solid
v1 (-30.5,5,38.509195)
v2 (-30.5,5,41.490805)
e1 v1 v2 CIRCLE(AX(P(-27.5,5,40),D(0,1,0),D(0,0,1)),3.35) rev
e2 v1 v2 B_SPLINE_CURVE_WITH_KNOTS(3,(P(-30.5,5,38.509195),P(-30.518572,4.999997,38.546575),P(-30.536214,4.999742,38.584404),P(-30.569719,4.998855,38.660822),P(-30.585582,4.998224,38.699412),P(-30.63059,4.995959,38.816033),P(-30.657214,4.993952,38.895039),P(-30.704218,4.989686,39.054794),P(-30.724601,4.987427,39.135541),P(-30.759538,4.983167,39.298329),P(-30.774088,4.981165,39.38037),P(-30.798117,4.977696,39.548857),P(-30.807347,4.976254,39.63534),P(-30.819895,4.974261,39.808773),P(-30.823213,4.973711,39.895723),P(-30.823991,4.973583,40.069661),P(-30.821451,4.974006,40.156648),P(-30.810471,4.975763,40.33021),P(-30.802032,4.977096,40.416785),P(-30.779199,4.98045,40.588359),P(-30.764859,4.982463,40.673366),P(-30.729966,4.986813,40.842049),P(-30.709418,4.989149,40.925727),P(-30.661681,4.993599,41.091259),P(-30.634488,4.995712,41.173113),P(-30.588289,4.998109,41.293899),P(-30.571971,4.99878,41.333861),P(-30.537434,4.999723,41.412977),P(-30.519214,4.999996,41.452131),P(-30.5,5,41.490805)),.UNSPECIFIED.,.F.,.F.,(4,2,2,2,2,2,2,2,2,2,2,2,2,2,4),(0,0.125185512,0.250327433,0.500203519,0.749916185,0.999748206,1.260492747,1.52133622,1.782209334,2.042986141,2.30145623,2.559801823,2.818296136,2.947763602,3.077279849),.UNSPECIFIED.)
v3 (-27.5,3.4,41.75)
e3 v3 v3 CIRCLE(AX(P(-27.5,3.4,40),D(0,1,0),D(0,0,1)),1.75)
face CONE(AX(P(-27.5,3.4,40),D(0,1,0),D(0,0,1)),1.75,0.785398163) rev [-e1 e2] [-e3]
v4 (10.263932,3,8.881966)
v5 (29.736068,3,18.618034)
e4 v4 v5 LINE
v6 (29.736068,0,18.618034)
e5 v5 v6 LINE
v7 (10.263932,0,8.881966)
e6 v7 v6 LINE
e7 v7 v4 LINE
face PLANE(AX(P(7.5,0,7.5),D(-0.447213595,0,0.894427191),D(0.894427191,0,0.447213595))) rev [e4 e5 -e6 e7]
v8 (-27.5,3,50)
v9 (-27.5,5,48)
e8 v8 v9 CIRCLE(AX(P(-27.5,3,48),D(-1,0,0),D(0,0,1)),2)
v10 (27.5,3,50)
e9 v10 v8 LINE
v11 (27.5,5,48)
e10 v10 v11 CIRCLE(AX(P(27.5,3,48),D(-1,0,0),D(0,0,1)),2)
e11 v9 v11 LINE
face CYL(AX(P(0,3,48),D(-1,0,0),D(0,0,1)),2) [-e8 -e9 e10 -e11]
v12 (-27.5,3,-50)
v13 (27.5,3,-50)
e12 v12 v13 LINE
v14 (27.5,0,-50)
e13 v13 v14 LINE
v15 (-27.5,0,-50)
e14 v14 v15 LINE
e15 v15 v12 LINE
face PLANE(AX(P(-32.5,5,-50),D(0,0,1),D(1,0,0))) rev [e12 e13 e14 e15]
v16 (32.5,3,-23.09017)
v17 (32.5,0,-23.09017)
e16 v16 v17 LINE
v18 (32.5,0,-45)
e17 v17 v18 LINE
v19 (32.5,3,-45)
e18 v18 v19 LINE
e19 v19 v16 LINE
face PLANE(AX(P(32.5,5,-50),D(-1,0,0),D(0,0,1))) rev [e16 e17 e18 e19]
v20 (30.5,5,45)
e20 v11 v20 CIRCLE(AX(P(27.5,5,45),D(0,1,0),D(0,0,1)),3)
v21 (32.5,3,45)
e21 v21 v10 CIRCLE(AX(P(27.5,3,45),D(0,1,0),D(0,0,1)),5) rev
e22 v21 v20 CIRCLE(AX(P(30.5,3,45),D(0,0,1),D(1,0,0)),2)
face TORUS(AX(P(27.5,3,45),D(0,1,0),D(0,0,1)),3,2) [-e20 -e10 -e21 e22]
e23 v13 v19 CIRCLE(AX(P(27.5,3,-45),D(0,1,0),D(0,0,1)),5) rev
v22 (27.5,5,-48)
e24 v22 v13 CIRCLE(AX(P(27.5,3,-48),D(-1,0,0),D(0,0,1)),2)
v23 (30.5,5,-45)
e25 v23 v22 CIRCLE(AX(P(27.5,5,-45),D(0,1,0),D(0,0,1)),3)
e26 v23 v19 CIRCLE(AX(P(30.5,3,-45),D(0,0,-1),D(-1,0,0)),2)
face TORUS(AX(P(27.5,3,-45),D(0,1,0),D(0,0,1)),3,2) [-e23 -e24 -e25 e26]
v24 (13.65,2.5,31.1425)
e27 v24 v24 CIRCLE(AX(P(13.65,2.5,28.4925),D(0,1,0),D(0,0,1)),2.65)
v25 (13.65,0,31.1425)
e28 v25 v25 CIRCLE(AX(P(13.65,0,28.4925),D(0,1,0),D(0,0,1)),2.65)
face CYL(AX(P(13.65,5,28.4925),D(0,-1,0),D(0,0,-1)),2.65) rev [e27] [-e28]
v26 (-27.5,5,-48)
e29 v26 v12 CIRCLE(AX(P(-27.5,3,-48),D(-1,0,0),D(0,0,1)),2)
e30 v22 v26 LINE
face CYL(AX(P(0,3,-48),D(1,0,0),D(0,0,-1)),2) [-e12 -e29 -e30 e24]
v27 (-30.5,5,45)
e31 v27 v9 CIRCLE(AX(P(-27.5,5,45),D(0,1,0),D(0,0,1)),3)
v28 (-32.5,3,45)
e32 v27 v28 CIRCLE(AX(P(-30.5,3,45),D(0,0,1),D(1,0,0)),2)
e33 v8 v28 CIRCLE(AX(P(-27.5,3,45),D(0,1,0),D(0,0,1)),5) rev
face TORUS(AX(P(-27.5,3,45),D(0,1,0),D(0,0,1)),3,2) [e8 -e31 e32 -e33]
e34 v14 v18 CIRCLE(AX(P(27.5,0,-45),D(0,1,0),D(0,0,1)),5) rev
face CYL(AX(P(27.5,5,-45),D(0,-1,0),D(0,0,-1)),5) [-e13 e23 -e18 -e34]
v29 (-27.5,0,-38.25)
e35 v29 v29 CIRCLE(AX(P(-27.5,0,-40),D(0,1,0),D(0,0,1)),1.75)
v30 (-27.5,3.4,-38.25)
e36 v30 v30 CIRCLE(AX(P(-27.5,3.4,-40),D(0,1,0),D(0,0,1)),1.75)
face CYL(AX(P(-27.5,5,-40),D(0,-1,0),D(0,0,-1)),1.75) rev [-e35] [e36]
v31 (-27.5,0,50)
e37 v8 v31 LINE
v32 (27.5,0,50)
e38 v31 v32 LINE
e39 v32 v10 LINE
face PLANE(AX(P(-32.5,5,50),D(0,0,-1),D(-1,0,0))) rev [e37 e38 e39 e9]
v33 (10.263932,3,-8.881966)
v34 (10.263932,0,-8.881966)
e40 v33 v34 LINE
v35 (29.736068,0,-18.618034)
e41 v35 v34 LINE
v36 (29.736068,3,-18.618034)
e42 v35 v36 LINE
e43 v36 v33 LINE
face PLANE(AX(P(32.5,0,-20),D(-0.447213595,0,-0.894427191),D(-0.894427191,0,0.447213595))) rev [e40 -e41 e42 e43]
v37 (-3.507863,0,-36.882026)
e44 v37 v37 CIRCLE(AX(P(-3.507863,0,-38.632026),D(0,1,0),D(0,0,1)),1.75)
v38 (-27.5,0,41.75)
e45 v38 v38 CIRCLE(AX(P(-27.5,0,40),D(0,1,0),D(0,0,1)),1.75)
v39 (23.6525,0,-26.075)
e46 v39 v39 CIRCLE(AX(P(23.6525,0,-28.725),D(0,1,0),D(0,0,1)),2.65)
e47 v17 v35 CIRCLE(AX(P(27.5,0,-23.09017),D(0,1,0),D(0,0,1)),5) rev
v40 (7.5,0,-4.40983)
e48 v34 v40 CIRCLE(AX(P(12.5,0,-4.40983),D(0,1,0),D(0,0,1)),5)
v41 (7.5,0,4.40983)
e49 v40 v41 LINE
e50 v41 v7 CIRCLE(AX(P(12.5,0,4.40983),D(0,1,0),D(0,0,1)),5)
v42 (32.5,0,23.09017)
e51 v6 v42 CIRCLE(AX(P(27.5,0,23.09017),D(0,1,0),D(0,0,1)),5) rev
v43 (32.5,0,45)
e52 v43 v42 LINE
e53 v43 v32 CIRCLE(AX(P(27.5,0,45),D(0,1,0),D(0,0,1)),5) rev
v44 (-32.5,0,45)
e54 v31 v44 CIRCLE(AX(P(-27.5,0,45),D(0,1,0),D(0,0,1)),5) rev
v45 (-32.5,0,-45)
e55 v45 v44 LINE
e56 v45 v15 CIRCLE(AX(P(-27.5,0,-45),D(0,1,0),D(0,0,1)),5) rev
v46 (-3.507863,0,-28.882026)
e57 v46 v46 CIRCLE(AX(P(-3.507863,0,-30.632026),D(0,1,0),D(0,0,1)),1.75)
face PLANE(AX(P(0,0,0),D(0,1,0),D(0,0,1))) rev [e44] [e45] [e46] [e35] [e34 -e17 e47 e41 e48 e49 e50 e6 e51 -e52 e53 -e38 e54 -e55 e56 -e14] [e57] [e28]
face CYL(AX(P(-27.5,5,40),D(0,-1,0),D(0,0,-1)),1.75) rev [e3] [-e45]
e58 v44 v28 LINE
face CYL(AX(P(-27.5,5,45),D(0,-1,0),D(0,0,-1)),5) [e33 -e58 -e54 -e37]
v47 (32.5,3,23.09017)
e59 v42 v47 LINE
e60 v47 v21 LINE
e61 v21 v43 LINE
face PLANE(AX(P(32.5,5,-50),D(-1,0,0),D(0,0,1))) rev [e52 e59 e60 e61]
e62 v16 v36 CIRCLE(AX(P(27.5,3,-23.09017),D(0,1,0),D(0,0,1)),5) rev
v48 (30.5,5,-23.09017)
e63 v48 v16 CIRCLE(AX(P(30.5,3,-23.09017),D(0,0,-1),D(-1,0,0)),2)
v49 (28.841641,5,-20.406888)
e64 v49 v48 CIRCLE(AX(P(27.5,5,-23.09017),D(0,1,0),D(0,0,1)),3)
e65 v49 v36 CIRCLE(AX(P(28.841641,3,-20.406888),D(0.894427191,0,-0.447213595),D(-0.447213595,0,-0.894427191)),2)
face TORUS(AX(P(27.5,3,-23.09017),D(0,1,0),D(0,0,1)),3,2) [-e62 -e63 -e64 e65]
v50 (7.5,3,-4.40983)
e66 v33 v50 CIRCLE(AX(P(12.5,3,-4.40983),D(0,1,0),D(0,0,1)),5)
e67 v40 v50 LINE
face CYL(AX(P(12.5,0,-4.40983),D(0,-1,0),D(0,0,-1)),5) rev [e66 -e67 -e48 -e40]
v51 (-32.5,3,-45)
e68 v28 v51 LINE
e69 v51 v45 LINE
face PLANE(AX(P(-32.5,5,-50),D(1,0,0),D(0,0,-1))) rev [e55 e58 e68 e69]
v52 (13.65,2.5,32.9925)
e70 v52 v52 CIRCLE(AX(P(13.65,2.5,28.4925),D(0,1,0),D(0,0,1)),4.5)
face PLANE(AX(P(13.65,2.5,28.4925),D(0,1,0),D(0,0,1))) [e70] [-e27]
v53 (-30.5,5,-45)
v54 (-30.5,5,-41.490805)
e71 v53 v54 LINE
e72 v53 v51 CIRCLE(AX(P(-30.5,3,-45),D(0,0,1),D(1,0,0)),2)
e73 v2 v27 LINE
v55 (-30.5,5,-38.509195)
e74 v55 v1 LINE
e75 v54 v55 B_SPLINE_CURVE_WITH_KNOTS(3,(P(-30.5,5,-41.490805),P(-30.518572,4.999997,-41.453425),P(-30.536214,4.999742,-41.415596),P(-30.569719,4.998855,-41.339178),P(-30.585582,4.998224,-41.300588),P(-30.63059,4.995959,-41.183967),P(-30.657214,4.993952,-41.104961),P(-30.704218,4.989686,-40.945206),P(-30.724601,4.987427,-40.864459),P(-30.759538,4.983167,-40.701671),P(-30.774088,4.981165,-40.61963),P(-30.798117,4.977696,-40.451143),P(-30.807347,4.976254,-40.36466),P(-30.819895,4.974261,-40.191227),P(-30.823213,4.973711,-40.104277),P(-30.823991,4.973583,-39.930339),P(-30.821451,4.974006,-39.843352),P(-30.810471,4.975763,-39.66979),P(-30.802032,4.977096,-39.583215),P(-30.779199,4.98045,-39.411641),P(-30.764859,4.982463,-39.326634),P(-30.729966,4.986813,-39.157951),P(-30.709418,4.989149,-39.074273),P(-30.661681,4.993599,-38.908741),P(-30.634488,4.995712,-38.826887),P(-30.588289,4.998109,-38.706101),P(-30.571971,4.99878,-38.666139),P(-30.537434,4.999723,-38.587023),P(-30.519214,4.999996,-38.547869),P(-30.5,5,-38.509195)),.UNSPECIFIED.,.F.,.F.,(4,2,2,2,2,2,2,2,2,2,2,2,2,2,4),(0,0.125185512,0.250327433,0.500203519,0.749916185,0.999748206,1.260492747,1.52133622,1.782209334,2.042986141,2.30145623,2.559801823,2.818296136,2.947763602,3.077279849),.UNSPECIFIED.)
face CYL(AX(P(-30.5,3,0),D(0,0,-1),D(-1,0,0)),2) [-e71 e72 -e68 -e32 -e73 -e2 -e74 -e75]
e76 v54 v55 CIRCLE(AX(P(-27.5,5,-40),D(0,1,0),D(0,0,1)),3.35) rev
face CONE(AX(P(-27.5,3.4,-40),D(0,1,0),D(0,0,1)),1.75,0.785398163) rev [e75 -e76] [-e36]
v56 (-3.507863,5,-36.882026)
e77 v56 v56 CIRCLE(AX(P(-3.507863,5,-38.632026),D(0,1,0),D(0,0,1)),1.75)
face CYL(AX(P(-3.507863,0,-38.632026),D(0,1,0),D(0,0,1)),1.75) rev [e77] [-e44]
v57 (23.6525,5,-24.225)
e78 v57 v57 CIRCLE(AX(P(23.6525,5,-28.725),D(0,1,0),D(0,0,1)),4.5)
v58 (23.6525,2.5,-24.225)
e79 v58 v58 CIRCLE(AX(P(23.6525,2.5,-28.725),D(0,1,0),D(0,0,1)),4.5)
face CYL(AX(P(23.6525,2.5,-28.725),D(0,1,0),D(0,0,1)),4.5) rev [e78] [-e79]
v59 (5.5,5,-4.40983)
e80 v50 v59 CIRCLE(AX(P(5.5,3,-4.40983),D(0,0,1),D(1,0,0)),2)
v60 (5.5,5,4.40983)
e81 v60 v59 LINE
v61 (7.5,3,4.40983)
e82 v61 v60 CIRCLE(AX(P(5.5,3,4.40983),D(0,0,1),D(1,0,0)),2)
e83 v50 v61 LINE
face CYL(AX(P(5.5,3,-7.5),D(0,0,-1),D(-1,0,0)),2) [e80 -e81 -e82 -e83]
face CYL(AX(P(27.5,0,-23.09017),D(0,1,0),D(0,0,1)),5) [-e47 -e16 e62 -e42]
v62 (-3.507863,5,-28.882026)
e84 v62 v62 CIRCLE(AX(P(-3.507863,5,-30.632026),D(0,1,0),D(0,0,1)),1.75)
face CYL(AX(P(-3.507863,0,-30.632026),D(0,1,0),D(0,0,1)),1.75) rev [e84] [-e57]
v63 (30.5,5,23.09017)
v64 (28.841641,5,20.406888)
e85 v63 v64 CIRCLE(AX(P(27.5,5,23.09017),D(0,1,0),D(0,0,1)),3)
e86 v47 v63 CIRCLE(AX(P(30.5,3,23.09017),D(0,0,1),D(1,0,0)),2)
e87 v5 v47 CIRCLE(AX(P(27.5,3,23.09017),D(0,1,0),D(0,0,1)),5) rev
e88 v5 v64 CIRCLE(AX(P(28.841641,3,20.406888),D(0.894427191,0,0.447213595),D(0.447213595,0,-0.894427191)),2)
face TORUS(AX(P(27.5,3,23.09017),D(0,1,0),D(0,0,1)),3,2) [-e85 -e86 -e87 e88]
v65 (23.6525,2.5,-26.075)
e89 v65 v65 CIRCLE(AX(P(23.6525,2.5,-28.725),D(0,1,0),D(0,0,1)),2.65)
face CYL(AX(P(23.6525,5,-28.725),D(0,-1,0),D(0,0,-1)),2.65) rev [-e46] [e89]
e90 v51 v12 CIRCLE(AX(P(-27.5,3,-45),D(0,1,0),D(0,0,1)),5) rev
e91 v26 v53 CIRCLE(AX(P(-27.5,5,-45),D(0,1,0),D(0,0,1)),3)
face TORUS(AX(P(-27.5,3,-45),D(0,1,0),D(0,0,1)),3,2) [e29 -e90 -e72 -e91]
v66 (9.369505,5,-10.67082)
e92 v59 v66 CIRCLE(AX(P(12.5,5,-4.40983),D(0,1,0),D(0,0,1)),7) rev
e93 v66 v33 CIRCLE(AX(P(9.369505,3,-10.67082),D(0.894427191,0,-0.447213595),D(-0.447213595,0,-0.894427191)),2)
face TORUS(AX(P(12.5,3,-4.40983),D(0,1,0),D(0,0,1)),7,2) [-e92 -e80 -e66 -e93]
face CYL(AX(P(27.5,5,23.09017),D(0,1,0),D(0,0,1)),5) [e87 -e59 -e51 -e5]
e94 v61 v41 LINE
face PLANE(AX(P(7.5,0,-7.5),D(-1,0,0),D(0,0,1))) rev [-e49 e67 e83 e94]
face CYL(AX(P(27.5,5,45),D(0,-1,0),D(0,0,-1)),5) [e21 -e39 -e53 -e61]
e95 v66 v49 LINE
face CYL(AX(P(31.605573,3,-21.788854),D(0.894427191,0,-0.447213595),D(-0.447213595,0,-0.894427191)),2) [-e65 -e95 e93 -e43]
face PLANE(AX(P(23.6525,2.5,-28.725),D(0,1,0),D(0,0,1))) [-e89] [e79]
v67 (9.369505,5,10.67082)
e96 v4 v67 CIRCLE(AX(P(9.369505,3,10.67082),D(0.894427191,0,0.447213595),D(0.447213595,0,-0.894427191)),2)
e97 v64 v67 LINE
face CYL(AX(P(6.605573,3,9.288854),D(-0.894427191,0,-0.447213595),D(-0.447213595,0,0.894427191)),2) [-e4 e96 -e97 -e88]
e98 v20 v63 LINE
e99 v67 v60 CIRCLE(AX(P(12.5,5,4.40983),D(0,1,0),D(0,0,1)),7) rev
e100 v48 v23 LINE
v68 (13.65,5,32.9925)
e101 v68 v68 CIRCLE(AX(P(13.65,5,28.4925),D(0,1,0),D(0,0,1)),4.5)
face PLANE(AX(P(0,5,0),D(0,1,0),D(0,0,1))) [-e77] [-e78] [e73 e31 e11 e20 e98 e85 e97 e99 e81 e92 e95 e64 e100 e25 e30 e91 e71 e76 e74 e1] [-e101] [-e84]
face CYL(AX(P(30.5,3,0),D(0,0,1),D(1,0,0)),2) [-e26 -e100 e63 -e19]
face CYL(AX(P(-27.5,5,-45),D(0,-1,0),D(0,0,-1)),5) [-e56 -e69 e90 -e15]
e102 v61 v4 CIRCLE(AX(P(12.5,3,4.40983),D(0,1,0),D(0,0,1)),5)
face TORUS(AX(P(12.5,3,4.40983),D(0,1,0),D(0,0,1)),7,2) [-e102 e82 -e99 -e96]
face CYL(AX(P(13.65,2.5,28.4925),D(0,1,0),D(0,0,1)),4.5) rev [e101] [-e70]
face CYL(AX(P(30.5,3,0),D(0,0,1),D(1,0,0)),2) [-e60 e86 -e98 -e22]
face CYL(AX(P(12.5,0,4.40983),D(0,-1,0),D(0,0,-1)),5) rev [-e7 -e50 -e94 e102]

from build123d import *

# Parameters (mm, degrees)
SKETCH2_W           = 65
SKETCH2_H           = 100
SKETCH2_R           = 1.75
SKETCH2_R_2         = 2.65
BOSS_EXTRUDE1_DEPTH = 5
SKETCH3_R           = 4.5
CUT_EXTRUDE1_DEPTH  = 2.5
CUT_EXTRUDE2_DEPTH  = 60.843546018
FILLET1_R           = 5
CHAMFER1_SIZE       = 1.6
FILLET3_R           = 5
FILLET2_R           = 2
SKETCH5_R           = 1.75
CUT_EXTRUDE3_DEPTH  = 60.843546072


with BuildPart() as part:
    # Sketch2 → Boss-Extrude1 (new body)
    with BuildSketch(Plane(origin=(0, 0, 0), x_dir=(1, 0, 0), z_dir=(0, 1, 0))):
        Rectangle(SKETCH2_W, SKETCH2_H)
        with Locations(Location((-27.5, 40, 0), (0, 0, 270))):
            Circle(SKETCH2_R, mode=Mode.SUBTRACT)
        with Locations(Location((-27.5, -40, 0), (0, 0, 270))):
            Circle(SKETCH2_R, mode=Mode.SUBTRACT)
        with Locations(Location((23.6525, 28.725, 0), (0, 0, 270))):
            Circle(SKETCH2_R_2, mode=Mode.SUBTRACT)
        with Locations(Location((13.65, -28.4925, 0), (0, 0, 270))):
            Circle(SKETCH2_R_2, mode=Mode.SUBTRACT)
    extrude(amount=BOSS_EXTRUDE1_DEPTH)

    # Sketch3 → Cut-Extrude1 (cut)
    with BuildSketch(Plane(origin=(0, 5, 0), x_dir=(1, 0, 0), z_dir=(0, 1, 0))):
        with Locations(Location((23.6525, 28.725, 0), (0, 0, 270))):
            Circle(SKETCH3_R)
        with Locations(Location((13.65, -28.4925, 0), (0, 0, 270))):
            Circle(SKETCH3_R)
    extrude(amount=-CUT_EXTRUDE1_DEPTH, mode=Mode.SUBTRACT)

    # Sketch4 → Cut-Extrude2 (cut, through all)
    with BuildSketch(Plane(origin=(0, 5, 0), x_dir=(1, 0, 0), z_dir=(0, 1, 0))):
        Polygon((7.5, 7.5), (7.5, -7.5), (32.5, -20), (32.5, 20), align=None)
    extrude(amount=-CUT_EXTRUDE2_DEPTH, mode=Mode.SUBTRACT)

    # Fillet1
    fillet1_edges = [part.edges().sort_by_distance(p)[0] for p in [
        (32.5, 2.5, 50),
        (-32.5, 2.5, 50),
        (-32.5, 2.5, -50),
        (32.5, 2.5, -50),
    ]]
    fillet(fillet1_edges, radius=FILLET1_R)

    # Chamfer1
    chamfer1_edges = [part.edges().sort_by_distance(p)[0] for p in [
        (-27.5, 5, -41.75),
        (-27.5, 5, 38.25),
    ]]
    chamfer(chamfer1_edges, length=CHAMFER1_SIZE)

    # Fillet3
    fillet3_edges = [part.edges().sort_by_distance(p)[0] for p in [
        (7.5, 2.5, -7.5),
        (32.5, 2.5, -20),
        (32.5, 2.5, 20),
        (7.5, 2.5, 7.5),
    ]]
    fillet(fillet3_edges, radius=FILLET3_R)

    # Fillet2
    # the kernel refuses this fillet: 2 mm, written as the material it takes off along each edge
    with BuildSketch(Plane(origin=(12.5, 5, 4.409830056), x_dir=(-0.447213595499958, 0, 0.894427190999916), z_dir=(0.894427190999916, 0, 0.447213595499958))) as fillet2_piece_1:
        with BuildLine():
            CenterArc((5 + FILLET2_R, FILLET2_R), FILLET2_R, 180, 90)
            Line((5, FILLET2_R), (5, 0))
            Line((5, 0), (5 + FILLET2_R, 0))
        make_face()
    revolve(axis=Axis((12.5, 5, 4.409830056), (0, -1, 0)), revolution_arc=63.434948823, mode=Mode.SUBTRACT)
    with BuildSketch(Plane(origin=(12.5, 5, -4.409830056), x_dir=(-0.447213595499958, 0, -0.894427190999916), z_dir=(0.894427190999916, 0, -0.447213595499958))) as fillet2_piece_2:
        with BuildLine():
            CenterArc((5 + FILLET2_R, -FILLET2_R), FILLET2_R, 90, 90)
            Line((5, -FILLET2_R), (5, 0))
            Line((5, 0), (5 + FILLET2_R, 0))
        make_face()
    revolve(axis=Axis((12.5, 5, -4.409830056), (0, 1, 0)), revolution_arc=63.434948823, mode=Mode.SUBTRACT)
    with BuildSketch(Plane(origin=(32.5, 5, 23.090169944), x_dir=(-1, 0, 0), z_dir=(0, 0, 1)), Plane(origin=(32.5, 5, -45), x_dir=(-1, 0, 0), z_dir=(0, 0, 1))) as fillet2_piece_3:
        with BuildLine():
            CenterArc((FILLET2_R, FILLET2_R), FILLET2_R, 180, 90)
            Line((0, FILLET2_R), (0, 0))
            Line((0, 0), (FILLET2_R, 0))
        make_face()
    extrude(amount=21.909830056, mode=Mode.SUBTRACT)
    with BuildSketch(Plane(origin=(27.5, 5, 50), x_dir=(0, 0, -1), z_dir=(-1, 0, 0)), Plane(origin=(-27.5, 5, -50), x_dir=(0, 0, 1), z_dir=(1, 0, 0))) as fillet2_piece_4:
        with BuildLine():
            CenterArc((FILLET2_R, FILLET2_R), FILLET2_R, 180, 90)
            Line((0, FILLET2_R), (0, 0))
            Line((0, 0), (FILLET2_R, 0))
        make_face()
    extrude(amount=55, mode=Mode.SUBTRACT)
    with BuildSketch(Plane(origin=(-32.5, 5, 45), x_dir=(1, 0, 0), z_dir=(0, 0, -1))) as fillet2_piece_5:
        with BuildLine():
            CenterArc((FILLET2_R, FILLET2_R), FILLET2_R, 180, 90)
            Line((0, FILLET2_R), (0, 0))
            Line((0, 0), (FILLET2_R, 0))
        make_face()
    extrude(amount=90, mode=Mode.SUBTRACT)
    with BuildSketch(Plane(origin=(-27.5, 5, 45), x_dir=(-1, 0, 0), z_dir=(0, 0, -1))) as fillet2_piece_6:
        with BuildLine():
            CenterArc((5 - FILLET2_R, -FILLET2_R), FILLET2_R, 0, 90)
            Line((5, -FILLET2_R), (5, 0))
            Line((5, 0), (5 - FILLET2_R, 0))
        make_face()
    revolve(axis=Axis((-27.5, 5, 45), (0, 1, 0)), revolution_arc=90, mode=Mode.SUBTRACT)
    with BuildSketch(Plane(origin=(27.5, 5, -45), x_dir=(0, 0, -1), z_dir=(-1, 0, 0))) as fillet2_piece_7:
        with BuildLine():
            CenterArc((5 - FILLET2_R, FILLET2_R), FILLET2_R, 270, 90)
            Line((5, FILLET2_R), (5, 0))
            Line((5, 0), (5 - FILLET2_R, 0))
        make_face()
    revolve(axis=Axis((27.5, 5, -45), (0, -1, 0)), revolution_arc=90, mode=Mode.SUBTRACT)
    with BuildSketch(Plane(origin=(-27.5, 5, -45), x_dir=(0, 0, -1), z_dir=(1, 0, 0))) as fillet2_piece_8:
        with BuildLine():
            CenterArc((5 - FILLET2_R, -FILLET2_R), FILLET2_R, 0, 90)
            Line((5, -FILLET2_R), (5, 0))
            Line((5, 0), (5 - FILLET2_R, 0))
        make_face()
    revolve(axis=Axis((-27.5, 5, -45), (0, 1, 0)), revolution_arc=90, mode=Mode.SUBTRACT)
    with BuildSketch(Plane(origin=(27.5, 5, 45), x_dir=(0, 0, 1), z_dir=(-1, 0, 0))) as fillet2_piece_9:
        with BuildLine():
            CenterArc((5 - FILLET2_R, -FILLET2_R), FILLET2_R, 0, 90)
            Line((5, -FILLET2_R), (5, 0))
            Line((5, 0), (5 - FILLET2_R, 0))
        make_face()
    revolve(axis=Axis((27.5, 5, 45), (0, 1, 0)), revolution_arc=90, mode=Mode.SUBTRACT)
    with BuildSketch(Plane(origin=(29.736067977, 5, -18.618033989), x_dir=(-0.4472135954999579, 0, -0.8944271909999159), z_dir=(-0.894427190999916, 0, 0.4472135954999579)), Plane(origin=(10.263932023, 5, 8.881966011), x_dir=(-0.4472135954999579, 0, 0.894427190999916), z_dir=(0.894427190999916, 0, 0.4472135954999579))) as fillet2_piece_10:
        with BuildLine():
            CenterArc((FILLET2_R, FILLET2_R), FILLET2_R, 180, 90)
            Line((0, FILLET2_R), (0, 0))
            Line((0, 0), (FILLET2_R, 0))
        make_face()
    extrude(amount=21.770509831, mode=Mode.SUBTRACT)
    with BuildSketch(Plane(origin=(7.5, 5, -4.409830056), x_dir=(-1, 0, 0), z_dir=(0, 0, 1))) as fillet2_piece_11:
        with BuildLine():
            CenterArc((FILLET2_R, FILLET2_R), FILLET2_R, 180, 90)
            Line((0, FILLET2_R), (0, 0))
            Line((0, 0), (FILLET2_R, 0))
        make_face()
    extrude(amount=8.819660113, mode=Mode.SUBTRACT)
    with BuildSketch(Plane(origin=(27.5, 5, 23.090169944), x_dir=(1, 0, 0), z_dir=(0, 0, 1))) as fillet2_piece_12:
        with BuildLine():
            CenterArc((5 - FILLET2_R, -FILLET2_R), FILLET2_R, 0, 90)
            Line((5, -FILLET2_R), (5, 0))
            Line((5, 0), (5 - FILLET2_R, 0))
        make_face()
    revolve(axis=Axis((27.5, 5, 23.090169944), (0, 1, 0)), revolution_arc=63.434948823, mode=Mode.SUBTRACT)
    with BuildSketch(Plane(origin=(27.5, 5, -23.090169944), x_dir=(1, 0, 0), z_dir=(0, 0, -1))) as fillet2_piece_13:
        with BuildLine():
            CenterArc((5 - FILLET2_R, FILLET2_R), FILLET2_R, 270, 90)
            Line((5, FILLET2_R), (5, 0))
            Line((5, 0), (5 - FILLET2_R, 0))
        make_face()
    revolve(axis=Axis((27.5, 5, -23.090169944), (0, -1, 0)), revolution_arc=63.434948823, mode=Mode.SUBTRACT)

    # Sketch5 → Cut-Extrude3 (cut, through all)
    with BuildSketch(Plane(origin=(0, 5, 0), x_dir=(1, 0, 0), z_dir=(0, 1, 0))):
        with Locations(Location((-3.507863002, 38.632025627, 0), (0, 0, 270))):
            Circle(SKETCH5_R)
        with Locations(Location((-3.507863002, 30.632025627, 0), (0, 0, 270))):
            Circle(SKETCH5_R)
    extrude(amount=-CUT_EXTRUDE3_DEPTH, mode=Mode.SUBTRACT)


solid = part.part
